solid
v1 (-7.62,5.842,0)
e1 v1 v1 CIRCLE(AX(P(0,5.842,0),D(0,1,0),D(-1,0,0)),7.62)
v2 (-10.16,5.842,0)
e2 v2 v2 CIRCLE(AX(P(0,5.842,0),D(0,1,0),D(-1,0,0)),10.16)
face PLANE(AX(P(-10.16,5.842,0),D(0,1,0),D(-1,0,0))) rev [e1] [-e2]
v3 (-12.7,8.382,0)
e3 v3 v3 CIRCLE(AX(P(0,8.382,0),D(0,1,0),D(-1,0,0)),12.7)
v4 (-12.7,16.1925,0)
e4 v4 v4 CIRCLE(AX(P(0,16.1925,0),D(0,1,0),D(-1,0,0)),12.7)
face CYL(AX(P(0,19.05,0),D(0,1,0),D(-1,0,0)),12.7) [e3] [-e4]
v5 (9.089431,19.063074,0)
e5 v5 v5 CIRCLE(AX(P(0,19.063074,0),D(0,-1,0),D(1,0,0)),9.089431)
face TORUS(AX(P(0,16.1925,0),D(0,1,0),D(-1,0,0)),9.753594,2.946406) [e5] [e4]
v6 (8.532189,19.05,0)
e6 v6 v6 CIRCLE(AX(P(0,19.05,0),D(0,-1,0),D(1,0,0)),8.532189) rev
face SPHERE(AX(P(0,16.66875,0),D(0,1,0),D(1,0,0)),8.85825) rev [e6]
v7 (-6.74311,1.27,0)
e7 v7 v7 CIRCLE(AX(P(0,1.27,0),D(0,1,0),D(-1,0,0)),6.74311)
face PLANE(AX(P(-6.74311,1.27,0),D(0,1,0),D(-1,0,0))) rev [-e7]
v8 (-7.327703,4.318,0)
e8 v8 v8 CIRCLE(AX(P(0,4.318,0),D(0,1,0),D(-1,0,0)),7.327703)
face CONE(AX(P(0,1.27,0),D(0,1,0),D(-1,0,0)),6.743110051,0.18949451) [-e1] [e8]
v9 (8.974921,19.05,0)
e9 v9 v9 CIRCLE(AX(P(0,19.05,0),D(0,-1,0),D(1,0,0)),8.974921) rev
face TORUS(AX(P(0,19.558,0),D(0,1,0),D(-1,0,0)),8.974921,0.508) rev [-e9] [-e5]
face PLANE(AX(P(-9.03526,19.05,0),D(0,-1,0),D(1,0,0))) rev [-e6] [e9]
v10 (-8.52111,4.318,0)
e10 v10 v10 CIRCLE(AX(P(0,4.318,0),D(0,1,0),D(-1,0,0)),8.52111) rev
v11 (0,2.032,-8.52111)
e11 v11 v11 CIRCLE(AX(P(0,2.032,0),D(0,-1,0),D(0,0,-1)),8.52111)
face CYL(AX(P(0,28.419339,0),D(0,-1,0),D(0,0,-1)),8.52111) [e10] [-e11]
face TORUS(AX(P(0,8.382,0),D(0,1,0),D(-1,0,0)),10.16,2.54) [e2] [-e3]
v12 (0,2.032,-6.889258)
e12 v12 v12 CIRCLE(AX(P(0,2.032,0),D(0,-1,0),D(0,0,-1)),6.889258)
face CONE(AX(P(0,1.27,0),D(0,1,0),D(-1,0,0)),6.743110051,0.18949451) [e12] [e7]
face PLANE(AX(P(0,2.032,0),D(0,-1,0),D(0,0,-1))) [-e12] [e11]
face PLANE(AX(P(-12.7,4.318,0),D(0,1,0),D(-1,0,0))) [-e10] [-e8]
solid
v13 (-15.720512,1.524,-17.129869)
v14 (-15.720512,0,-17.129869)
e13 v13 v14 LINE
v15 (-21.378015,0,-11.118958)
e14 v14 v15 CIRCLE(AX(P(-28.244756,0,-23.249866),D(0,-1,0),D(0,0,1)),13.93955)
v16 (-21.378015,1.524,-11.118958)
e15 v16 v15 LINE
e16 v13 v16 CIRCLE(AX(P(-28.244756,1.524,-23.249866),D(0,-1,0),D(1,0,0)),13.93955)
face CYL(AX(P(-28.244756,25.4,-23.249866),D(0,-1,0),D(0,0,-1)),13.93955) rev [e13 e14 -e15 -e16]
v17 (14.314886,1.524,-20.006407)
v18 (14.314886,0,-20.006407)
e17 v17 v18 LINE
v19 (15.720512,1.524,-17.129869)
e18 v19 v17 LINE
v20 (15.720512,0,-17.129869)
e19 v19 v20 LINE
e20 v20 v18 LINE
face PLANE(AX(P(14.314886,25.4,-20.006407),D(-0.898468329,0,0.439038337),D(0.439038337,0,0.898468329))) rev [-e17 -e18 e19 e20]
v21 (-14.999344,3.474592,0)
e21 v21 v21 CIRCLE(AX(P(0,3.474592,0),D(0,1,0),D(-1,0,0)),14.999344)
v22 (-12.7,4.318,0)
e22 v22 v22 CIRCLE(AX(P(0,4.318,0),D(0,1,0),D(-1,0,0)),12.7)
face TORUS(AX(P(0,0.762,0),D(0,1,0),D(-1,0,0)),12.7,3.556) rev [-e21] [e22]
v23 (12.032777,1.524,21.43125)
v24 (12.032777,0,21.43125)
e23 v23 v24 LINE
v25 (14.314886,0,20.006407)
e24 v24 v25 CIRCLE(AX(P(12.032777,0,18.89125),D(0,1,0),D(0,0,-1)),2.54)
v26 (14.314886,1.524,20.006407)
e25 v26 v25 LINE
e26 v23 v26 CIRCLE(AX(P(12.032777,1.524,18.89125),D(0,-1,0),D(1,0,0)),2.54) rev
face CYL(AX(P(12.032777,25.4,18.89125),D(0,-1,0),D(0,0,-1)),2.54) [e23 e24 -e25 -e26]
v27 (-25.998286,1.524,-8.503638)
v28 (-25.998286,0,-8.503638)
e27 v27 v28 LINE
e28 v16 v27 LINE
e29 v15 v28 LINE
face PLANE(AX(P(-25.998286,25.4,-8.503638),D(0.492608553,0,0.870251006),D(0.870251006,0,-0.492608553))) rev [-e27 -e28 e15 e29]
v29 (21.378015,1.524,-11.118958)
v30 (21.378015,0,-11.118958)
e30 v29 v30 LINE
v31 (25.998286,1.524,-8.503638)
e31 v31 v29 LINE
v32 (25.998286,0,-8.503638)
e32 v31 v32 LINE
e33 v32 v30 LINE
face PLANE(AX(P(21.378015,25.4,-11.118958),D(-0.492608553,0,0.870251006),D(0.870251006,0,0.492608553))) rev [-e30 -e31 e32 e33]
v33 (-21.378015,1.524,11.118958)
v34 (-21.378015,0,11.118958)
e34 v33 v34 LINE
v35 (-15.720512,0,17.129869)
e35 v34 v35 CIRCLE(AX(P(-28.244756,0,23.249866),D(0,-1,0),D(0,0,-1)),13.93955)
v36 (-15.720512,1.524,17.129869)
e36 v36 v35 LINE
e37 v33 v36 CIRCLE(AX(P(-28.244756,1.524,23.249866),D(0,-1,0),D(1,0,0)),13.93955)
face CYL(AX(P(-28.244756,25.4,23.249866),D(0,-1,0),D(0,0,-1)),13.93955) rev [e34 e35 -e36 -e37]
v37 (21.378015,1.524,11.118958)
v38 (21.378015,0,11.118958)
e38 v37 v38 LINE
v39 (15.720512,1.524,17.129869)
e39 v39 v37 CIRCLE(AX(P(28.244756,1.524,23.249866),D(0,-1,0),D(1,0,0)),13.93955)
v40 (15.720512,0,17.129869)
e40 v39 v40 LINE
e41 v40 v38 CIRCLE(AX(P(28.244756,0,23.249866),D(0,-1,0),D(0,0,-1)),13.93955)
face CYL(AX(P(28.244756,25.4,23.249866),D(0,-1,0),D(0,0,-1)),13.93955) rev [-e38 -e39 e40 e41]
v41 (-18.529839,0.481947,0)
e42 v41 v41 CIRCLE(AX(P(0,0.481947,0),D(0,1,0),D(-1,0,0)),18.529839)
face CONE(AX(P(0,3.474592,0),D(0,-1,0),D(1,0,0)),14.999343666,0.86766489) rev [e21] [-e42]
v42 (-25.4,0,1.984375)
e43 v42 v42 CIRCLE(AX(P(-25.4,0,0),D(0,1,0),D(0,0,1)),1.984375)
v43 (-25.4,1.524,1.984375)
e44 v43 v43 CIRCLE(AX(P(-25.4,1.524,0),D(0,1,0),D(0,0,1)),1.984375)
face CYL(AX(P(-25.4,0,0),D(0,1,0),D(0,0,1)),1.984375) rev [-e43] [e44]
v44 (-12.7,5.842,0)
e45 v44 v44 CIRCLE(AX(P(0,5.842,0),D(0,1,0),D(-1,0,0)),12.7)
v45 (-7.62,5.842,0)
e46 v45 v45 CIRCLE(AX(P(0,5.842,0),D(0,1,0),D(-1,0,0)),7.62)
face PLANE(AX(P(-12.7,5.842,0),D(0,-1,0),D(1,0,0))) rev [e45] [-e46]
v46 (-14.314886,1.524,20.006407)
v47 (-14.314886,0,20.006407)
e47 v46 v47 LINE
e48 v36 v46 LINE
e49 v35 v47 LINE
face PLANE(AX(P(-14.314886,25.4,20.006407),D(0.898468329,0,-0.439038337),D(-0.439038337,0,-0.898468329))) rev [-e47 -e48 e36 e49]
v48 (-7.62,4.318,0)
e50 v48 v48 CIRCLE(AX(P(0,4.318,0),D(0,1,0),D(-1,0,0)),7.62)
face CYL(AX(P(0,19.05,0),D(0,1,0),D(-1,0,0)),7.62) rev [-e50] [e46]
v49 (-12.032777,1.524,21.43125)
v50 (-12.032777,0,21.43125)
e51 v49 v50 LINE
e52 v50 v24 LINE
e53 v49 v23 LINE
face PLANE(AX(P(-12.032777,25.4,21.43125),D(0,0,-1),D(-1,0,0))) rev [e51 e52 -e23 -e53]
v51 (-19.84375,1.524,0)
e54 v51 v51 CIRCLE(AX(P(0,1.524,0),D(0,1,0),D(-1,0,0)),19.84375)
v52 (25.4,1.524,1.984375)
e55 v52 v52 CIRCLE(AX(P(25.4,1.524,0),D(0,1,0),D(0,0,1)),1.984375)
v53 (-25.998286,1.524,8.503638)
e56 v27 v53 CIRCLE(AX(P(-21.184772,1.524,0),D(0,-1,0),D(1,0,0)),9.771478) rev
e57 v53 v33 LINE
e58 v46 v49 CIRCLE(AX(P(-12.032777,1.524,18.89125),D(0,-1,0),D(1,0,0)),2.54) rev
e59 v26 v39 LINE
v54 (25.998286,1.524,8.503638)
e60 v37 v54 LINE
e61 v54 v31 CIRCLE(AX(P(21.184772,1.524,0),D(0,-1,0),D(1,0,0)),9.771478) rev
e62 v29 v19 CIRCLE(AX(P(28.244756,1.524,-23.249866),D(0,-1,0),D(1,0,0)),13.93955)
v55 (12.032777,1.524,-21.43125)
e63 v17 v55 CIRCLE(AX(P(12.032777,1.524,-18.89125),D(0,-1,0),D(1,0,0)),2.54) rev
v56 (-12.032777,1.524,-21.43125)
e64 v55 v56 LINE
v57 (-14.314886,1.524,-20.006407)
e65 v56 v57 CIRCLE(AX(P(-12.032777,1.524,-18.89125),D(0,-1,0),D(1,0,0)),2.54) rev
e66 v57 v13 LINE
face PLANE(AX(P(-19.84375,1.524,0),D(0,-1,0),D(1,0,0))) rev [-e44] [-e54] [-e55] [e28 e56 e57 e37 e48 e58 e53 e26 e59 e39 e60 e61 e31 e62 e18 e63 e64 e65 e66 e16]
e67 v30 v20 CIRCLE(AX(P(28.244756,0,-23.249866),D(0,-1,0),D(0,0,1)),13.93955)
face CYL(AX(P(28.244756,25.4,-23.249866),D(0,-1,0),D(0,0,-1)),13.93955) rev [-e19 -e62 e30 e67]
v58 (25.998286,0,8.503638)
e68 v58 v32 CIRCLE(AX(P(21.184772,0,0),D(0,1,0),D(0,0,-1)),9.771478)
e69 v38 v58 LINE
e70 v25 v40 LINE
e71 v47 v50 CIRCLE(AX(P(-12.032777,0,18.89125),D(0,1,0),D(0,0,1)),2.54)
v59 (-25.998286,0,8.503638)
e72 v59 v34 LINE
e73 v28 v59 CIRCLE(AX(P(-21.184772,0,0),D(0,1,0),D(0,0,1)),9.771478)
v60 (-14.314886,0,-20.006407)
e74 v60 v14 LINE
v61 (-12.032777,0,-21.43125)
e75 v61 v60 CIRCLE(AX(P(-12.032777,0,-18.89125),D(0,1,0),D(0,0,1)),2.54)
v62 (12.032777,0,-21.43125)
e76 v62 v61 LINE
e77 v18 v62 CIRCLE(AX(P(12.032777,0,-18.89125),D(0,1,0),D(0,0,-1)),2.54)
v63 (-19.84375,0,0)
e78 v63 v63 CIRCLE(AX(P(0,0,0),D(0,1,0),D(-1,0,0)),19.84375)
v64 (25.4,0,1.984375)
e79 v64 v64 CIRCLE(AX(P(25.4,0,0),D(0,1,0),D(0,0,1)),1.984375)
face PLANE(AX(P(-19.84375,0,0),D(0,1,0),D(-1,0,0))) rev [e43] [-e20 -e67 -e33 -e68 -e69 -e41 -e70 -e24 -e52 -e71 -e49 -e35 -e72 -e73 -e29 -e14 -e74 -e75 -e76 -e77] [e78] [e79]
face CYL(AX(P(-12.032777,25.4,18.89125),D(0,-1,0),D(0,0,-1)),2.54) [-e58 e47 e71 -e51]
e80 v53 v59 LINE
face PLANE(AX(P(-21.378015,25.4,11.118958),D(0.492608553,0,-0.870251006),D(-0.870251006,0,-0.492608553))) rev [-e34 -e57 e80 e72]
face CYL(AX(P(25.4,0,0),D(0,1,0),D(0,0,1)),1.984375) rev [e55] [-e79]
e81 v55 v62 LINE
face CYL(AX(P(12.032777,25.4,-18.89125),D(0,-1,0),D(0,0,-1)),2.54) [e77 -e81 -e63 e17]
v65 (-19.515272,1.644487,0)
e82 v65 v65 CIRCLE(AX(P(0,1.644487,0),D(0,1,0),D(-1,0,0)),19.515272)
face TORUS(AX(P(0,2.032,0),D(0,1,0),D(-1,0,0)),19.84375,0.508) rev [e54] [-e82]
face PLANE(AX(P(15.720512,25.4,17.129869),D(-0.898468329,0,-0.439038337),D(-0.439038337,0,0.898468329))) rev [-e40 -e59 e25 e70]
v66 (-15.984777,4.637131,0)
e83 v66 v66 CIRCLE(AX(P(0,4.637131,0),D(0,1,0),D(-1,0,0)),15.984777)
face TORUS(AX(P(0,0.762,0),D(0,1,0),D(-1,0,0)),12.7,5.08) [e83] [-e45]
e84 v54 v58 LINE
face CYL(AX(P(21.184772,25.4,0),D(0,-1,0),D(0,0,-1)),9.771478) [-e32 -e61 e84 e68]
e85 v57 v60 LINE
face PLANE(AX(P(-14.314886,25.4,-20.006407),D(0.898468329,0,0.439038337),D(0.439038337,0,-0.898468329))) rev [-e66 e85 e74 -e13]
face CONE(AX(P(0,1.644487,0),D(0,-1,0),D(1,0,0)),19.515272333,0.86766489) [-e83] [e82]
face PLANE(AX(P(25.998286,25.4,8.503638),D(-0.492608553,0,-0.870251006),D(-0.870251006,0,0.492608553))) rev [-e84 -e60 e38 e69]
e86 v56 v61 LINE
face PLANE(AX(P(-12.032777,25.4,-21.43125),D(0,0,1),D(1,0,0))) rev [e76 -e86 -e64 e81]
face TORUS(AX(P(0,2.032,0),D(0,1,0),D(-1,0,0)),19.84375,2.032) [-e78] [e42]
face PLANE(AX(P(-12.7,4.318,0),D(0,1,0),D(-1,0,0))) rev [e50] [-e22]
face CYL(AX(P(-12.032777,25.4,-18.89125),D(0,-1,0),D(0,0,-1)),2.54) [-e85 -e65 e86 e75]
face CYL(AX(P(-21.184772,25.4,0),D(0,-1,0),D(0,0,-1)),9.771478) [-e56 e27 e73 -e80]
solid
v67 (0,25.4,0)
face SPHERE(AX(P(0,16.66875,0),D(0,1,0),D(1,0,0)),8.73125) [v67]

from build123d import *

# Parameters (mm, degrees)
SKETCH9_OUTSIDE_W   = 82.146
SKETCH9_OUTSIDE_H   = 82.146
CUT_EXTRUDE3_DEPTH  = 51.61362295
SKETCH8_R           = 1.984375
CUT_EXTRUDE1_DEPTH  = 45.58308274
FILLET1_R           = 0.508
BOSS_EXTRUDE2_START = -0.762
SKETCH7_R           = 8.521110051
BOSS_EXTRUDE2_DEPTH = 2.286


# Read off the part's stored shape, not the designer's step: Move Face1
with BuildPart() as part:
    # Sketch4 → Revolve3 (revolve)
    with BuildSketch(Plane.XY, mode=Mode.PRIVATE) as revolve3_sk:
        with BuildLine():
            Line((19.515272333, 1.644486874), (15.984776665, 4.637131257))
            ThreePointArc((15.984776665, 4.637131257), (14.449390353, 5.531280176), (12.7, 5.842))
            Line((12.7, 5.842), (7.62, 5.842))
            Line((7.62, 5.842), (7.62, 4.318))
            Line((7.62, 4.318), (12.7, 4.318))
            ThreePointArc((12.7, 4.318), (13.924573247, 4.100496123), (14.999343666, 3.47459188))
            Line((14.999343666, 3.47459188), (18.529839334, 0.481947497))
            ThreePointArc((18.529839334, 0.481947497), (19.143993859, 0.12428793), (19.84375, 0))
            Line((19.84375, 0), (30.95625, 0))
            Line((30.95625, 0), (30.95625, 1.524))
            Line((30.95625, 1.524), (19.84375, 1.524))
            ThreePointArc((19.84375, 1.524), (19.668810965, 1.555071982), (19.515272333, 1.644486874))
        make_face()
    revolve(revolve3_sk.sketch.rotate(Axis((0, 19.05, 0), (0, -1, 0)), 180), axis=Axis((0, 19.05, 0), (0, -1, 0)))

    # Sketch9 outside → Cut-Extrude3 (cut, through all)
    with BuildSketch(Plane(origin=(0, 0, 0), x_dir=(1, 0, 0), z_dir=(0, 1, 0))):
        Rectangle(SKETCH9_OUTSIDE_W, SKETCH9_OUTSIDE_H)
        with BuildLine():
            Line((-12.032776552, 21.43125), (12.032776552, 21.43125))
            ThreePointArc((12.032776552, 21.43125), (13.377971754, 21.045791684), (14.314886108, 20.006407376))
            Line((14.314886108, 20.006407376), (15.720512319, 17.129868982))
            ThreePointArc((15.720512319, 17.129868982), (18.094123839, 13.696033599), (21.378014937, 11.118958448))
            Line((21.378014937, 11.118958448), (25.998285744, 8.503638382))
            ThreePointArc((25.998285744, 8.503638382), (30.95625, 0), (25.998285744, -8.503638382))
            Line((25.998285744, -8.503638382), (21.378014937, -11.118958448))
            ThreePointArc((21.378014937, -11.118958448), (18.094123839, -13.696033599), (15.720512319, -17.129868982))
            Line((15.720512319, -17.129868982), (14.314886108, -20.006407376))
            ThreePointArc((14.314886108, -20.006407376), (13.377971754, -21.045791684), (12.032776552, -21.43125))
            Line((12.032776552, -21.43125), (-12.032776552, -21.43125))
            ThreePointArc((-12.032776552, -21.43125), (-13.377971754, -21.045791684), (-14.314886108, -20.006407376))
            Line((-14.314886108, -20.006407376), (-15.720512319, -17.129868982))
            ThreePointArc((-15.720512319, -17.129868982), (-18.094123839, -13.696033599), (-21.378014937, -11.118958448))
            Line((-21.378014937, -11.118958448), (-25.998285744, -8.503638382))
            ThreePointArc((-25.998285744, -8.503638382), (-30.95625, 0), (-25.998285744, 8.503638382))
            Line((-25.998285744, 8.503638382), (-21.378014937, 11.118958448))
            ThreePointArc((-21.378014937, 11.118958448), (-18.094123839, 13.696033599), (-15.720512319, 17.129868982))
            Line((-15.720512319, 17.129868982), (-14.314886108, 20.006407376))
            ThreePointArc((-14.314886108, 20.006407376), (-13.377971754, 21.045791684), (-12.032776552, 21.43125))
        make_face(mode=Mode.SUBTRACT)
    extrude(amount=CUT_EXTRUDE3_DEPTH, mode=Mode.SUBTRACT)

    # Sketch8 → Cut-Extrude1 (cut, through all)
    with BuildSketch(Plane(origin=(0, 1.524, 0), x_dir=(1, 0, 0), z_dir=(0, 1, 0))):
        with Locations(Location((-25.4, 0, 0), (0, 0, 270))):
            Circle(SKETCH8_R)
        with Locations(Location((25.4, 0, 0), (0, 0, 270))):
            Circle(SKETCH8_R)
    extrude(amount=-CUT_EXTRUDE1_DEPTH, mode=Mode.SUBTRACT)


with BuildPart() as body_2:
    # Sketch1 → Revolve1 (revolve)
    with BuildSketch(Plane.XY, mode=Mode.PRIVATE) as revolve1_sk:
        with BuildLine():
            Line((12.7, 16.1925), (12.7, 8.382))
            ThreePointArc((12.7, 8.382), (11.956051224, 6.585948776), (10.16, 5.842))
            Line((10.16, 5.842), (7.62, 5.842))
            Line((7.62, 5.842), (6.743110051, 1.27))
            Line((6.743110051, 1.27), (0, 1.27))
            Line((0, 1.27), (0, 19.05))
            Line((0, 19.05), (9.035260413, 19.05))
            ThreePointArc((9.035260413, 19.05), (11.565334331, 18.516054523), (12.7, 16.1925))
        make_face()
    revolve(revolve1_sk.sketch.rotate(Axis((0, 19.05, 0), (0, -1, 0)), 180), axis=Axis((0, 19.05, 0), (0, -1, 0)))

    # Sketch3<2> → Cut-Revolve1 (revolve, cut)
    with BuildSketch(Plane.XY):
        with BuildLine():
            Line((0, 25.4), (0, 7.9375))
            ThreePointArc((0, 7.9375), (8.73125, 16.66875), (0, 25.4))
        make_face()
    revolve(axis=Axis((0, 25.4, 0), (0, -1, 0)), mode=Mode.SUBTRACT)

    # Move Face1 outline → Move Face1 (revolve, cut)
    with BuildSketch(Plane.XY):
        with BuildLine():
            Line((0, 7.9375), (0, 7.8105))
            ThreePointArc((0, 7.8105), (7.055575843, 11.312684038), (8.53218855, 19.050000009))
            Line((8.53218855, 19.050000009), (8.40026041, 19.050000008))
            ThreePointArc((8.40026041, 19.050000008), (6.965127985, 11.403608149), (0, 7.9375))
        make_face()
    revolve(axis=Axis((0, 0, 0), (0, 1, 0)), mode=Mode.SUBTRACT)

    # Fillet1
    fillet1_edges = [body_2.edges().sort_by_distance(p)[0] for p in [
        (9.035260413, 19.05, 0),
    ]]
    fillet(fillet1_edges, radius=FILLET1_R)

    # Sketch7 → Boss-Extrude2 (add)
    with BuildSketch(Plane.XZ.offset(-1.27).offset(BOSS_EXTRUDE2_START)):
        with Locations(Location((0, 0, 0), (0, 0, 270))):
            Circle(SKETCH7_R)
    extrude(amount=-BOSS_EXTRUDE2_DEPTH)


with BuildPart() as body_3:
    # Sketch3 → Revolve2 (revolve)
    with BuildSketch(Plane.XY):
        with BuildLine():
            Line((0, 25.4), (0, 7.9375))
            ThreePointArc((0, 7.9375), (8.73125, 16.66875), (0, 25.4))
        make_face()
    revolve(axis=Axis((0, 25.4, 0), (0, -1, 0)))


solid = Compound([part.part, body_2.part, body_3.part])
